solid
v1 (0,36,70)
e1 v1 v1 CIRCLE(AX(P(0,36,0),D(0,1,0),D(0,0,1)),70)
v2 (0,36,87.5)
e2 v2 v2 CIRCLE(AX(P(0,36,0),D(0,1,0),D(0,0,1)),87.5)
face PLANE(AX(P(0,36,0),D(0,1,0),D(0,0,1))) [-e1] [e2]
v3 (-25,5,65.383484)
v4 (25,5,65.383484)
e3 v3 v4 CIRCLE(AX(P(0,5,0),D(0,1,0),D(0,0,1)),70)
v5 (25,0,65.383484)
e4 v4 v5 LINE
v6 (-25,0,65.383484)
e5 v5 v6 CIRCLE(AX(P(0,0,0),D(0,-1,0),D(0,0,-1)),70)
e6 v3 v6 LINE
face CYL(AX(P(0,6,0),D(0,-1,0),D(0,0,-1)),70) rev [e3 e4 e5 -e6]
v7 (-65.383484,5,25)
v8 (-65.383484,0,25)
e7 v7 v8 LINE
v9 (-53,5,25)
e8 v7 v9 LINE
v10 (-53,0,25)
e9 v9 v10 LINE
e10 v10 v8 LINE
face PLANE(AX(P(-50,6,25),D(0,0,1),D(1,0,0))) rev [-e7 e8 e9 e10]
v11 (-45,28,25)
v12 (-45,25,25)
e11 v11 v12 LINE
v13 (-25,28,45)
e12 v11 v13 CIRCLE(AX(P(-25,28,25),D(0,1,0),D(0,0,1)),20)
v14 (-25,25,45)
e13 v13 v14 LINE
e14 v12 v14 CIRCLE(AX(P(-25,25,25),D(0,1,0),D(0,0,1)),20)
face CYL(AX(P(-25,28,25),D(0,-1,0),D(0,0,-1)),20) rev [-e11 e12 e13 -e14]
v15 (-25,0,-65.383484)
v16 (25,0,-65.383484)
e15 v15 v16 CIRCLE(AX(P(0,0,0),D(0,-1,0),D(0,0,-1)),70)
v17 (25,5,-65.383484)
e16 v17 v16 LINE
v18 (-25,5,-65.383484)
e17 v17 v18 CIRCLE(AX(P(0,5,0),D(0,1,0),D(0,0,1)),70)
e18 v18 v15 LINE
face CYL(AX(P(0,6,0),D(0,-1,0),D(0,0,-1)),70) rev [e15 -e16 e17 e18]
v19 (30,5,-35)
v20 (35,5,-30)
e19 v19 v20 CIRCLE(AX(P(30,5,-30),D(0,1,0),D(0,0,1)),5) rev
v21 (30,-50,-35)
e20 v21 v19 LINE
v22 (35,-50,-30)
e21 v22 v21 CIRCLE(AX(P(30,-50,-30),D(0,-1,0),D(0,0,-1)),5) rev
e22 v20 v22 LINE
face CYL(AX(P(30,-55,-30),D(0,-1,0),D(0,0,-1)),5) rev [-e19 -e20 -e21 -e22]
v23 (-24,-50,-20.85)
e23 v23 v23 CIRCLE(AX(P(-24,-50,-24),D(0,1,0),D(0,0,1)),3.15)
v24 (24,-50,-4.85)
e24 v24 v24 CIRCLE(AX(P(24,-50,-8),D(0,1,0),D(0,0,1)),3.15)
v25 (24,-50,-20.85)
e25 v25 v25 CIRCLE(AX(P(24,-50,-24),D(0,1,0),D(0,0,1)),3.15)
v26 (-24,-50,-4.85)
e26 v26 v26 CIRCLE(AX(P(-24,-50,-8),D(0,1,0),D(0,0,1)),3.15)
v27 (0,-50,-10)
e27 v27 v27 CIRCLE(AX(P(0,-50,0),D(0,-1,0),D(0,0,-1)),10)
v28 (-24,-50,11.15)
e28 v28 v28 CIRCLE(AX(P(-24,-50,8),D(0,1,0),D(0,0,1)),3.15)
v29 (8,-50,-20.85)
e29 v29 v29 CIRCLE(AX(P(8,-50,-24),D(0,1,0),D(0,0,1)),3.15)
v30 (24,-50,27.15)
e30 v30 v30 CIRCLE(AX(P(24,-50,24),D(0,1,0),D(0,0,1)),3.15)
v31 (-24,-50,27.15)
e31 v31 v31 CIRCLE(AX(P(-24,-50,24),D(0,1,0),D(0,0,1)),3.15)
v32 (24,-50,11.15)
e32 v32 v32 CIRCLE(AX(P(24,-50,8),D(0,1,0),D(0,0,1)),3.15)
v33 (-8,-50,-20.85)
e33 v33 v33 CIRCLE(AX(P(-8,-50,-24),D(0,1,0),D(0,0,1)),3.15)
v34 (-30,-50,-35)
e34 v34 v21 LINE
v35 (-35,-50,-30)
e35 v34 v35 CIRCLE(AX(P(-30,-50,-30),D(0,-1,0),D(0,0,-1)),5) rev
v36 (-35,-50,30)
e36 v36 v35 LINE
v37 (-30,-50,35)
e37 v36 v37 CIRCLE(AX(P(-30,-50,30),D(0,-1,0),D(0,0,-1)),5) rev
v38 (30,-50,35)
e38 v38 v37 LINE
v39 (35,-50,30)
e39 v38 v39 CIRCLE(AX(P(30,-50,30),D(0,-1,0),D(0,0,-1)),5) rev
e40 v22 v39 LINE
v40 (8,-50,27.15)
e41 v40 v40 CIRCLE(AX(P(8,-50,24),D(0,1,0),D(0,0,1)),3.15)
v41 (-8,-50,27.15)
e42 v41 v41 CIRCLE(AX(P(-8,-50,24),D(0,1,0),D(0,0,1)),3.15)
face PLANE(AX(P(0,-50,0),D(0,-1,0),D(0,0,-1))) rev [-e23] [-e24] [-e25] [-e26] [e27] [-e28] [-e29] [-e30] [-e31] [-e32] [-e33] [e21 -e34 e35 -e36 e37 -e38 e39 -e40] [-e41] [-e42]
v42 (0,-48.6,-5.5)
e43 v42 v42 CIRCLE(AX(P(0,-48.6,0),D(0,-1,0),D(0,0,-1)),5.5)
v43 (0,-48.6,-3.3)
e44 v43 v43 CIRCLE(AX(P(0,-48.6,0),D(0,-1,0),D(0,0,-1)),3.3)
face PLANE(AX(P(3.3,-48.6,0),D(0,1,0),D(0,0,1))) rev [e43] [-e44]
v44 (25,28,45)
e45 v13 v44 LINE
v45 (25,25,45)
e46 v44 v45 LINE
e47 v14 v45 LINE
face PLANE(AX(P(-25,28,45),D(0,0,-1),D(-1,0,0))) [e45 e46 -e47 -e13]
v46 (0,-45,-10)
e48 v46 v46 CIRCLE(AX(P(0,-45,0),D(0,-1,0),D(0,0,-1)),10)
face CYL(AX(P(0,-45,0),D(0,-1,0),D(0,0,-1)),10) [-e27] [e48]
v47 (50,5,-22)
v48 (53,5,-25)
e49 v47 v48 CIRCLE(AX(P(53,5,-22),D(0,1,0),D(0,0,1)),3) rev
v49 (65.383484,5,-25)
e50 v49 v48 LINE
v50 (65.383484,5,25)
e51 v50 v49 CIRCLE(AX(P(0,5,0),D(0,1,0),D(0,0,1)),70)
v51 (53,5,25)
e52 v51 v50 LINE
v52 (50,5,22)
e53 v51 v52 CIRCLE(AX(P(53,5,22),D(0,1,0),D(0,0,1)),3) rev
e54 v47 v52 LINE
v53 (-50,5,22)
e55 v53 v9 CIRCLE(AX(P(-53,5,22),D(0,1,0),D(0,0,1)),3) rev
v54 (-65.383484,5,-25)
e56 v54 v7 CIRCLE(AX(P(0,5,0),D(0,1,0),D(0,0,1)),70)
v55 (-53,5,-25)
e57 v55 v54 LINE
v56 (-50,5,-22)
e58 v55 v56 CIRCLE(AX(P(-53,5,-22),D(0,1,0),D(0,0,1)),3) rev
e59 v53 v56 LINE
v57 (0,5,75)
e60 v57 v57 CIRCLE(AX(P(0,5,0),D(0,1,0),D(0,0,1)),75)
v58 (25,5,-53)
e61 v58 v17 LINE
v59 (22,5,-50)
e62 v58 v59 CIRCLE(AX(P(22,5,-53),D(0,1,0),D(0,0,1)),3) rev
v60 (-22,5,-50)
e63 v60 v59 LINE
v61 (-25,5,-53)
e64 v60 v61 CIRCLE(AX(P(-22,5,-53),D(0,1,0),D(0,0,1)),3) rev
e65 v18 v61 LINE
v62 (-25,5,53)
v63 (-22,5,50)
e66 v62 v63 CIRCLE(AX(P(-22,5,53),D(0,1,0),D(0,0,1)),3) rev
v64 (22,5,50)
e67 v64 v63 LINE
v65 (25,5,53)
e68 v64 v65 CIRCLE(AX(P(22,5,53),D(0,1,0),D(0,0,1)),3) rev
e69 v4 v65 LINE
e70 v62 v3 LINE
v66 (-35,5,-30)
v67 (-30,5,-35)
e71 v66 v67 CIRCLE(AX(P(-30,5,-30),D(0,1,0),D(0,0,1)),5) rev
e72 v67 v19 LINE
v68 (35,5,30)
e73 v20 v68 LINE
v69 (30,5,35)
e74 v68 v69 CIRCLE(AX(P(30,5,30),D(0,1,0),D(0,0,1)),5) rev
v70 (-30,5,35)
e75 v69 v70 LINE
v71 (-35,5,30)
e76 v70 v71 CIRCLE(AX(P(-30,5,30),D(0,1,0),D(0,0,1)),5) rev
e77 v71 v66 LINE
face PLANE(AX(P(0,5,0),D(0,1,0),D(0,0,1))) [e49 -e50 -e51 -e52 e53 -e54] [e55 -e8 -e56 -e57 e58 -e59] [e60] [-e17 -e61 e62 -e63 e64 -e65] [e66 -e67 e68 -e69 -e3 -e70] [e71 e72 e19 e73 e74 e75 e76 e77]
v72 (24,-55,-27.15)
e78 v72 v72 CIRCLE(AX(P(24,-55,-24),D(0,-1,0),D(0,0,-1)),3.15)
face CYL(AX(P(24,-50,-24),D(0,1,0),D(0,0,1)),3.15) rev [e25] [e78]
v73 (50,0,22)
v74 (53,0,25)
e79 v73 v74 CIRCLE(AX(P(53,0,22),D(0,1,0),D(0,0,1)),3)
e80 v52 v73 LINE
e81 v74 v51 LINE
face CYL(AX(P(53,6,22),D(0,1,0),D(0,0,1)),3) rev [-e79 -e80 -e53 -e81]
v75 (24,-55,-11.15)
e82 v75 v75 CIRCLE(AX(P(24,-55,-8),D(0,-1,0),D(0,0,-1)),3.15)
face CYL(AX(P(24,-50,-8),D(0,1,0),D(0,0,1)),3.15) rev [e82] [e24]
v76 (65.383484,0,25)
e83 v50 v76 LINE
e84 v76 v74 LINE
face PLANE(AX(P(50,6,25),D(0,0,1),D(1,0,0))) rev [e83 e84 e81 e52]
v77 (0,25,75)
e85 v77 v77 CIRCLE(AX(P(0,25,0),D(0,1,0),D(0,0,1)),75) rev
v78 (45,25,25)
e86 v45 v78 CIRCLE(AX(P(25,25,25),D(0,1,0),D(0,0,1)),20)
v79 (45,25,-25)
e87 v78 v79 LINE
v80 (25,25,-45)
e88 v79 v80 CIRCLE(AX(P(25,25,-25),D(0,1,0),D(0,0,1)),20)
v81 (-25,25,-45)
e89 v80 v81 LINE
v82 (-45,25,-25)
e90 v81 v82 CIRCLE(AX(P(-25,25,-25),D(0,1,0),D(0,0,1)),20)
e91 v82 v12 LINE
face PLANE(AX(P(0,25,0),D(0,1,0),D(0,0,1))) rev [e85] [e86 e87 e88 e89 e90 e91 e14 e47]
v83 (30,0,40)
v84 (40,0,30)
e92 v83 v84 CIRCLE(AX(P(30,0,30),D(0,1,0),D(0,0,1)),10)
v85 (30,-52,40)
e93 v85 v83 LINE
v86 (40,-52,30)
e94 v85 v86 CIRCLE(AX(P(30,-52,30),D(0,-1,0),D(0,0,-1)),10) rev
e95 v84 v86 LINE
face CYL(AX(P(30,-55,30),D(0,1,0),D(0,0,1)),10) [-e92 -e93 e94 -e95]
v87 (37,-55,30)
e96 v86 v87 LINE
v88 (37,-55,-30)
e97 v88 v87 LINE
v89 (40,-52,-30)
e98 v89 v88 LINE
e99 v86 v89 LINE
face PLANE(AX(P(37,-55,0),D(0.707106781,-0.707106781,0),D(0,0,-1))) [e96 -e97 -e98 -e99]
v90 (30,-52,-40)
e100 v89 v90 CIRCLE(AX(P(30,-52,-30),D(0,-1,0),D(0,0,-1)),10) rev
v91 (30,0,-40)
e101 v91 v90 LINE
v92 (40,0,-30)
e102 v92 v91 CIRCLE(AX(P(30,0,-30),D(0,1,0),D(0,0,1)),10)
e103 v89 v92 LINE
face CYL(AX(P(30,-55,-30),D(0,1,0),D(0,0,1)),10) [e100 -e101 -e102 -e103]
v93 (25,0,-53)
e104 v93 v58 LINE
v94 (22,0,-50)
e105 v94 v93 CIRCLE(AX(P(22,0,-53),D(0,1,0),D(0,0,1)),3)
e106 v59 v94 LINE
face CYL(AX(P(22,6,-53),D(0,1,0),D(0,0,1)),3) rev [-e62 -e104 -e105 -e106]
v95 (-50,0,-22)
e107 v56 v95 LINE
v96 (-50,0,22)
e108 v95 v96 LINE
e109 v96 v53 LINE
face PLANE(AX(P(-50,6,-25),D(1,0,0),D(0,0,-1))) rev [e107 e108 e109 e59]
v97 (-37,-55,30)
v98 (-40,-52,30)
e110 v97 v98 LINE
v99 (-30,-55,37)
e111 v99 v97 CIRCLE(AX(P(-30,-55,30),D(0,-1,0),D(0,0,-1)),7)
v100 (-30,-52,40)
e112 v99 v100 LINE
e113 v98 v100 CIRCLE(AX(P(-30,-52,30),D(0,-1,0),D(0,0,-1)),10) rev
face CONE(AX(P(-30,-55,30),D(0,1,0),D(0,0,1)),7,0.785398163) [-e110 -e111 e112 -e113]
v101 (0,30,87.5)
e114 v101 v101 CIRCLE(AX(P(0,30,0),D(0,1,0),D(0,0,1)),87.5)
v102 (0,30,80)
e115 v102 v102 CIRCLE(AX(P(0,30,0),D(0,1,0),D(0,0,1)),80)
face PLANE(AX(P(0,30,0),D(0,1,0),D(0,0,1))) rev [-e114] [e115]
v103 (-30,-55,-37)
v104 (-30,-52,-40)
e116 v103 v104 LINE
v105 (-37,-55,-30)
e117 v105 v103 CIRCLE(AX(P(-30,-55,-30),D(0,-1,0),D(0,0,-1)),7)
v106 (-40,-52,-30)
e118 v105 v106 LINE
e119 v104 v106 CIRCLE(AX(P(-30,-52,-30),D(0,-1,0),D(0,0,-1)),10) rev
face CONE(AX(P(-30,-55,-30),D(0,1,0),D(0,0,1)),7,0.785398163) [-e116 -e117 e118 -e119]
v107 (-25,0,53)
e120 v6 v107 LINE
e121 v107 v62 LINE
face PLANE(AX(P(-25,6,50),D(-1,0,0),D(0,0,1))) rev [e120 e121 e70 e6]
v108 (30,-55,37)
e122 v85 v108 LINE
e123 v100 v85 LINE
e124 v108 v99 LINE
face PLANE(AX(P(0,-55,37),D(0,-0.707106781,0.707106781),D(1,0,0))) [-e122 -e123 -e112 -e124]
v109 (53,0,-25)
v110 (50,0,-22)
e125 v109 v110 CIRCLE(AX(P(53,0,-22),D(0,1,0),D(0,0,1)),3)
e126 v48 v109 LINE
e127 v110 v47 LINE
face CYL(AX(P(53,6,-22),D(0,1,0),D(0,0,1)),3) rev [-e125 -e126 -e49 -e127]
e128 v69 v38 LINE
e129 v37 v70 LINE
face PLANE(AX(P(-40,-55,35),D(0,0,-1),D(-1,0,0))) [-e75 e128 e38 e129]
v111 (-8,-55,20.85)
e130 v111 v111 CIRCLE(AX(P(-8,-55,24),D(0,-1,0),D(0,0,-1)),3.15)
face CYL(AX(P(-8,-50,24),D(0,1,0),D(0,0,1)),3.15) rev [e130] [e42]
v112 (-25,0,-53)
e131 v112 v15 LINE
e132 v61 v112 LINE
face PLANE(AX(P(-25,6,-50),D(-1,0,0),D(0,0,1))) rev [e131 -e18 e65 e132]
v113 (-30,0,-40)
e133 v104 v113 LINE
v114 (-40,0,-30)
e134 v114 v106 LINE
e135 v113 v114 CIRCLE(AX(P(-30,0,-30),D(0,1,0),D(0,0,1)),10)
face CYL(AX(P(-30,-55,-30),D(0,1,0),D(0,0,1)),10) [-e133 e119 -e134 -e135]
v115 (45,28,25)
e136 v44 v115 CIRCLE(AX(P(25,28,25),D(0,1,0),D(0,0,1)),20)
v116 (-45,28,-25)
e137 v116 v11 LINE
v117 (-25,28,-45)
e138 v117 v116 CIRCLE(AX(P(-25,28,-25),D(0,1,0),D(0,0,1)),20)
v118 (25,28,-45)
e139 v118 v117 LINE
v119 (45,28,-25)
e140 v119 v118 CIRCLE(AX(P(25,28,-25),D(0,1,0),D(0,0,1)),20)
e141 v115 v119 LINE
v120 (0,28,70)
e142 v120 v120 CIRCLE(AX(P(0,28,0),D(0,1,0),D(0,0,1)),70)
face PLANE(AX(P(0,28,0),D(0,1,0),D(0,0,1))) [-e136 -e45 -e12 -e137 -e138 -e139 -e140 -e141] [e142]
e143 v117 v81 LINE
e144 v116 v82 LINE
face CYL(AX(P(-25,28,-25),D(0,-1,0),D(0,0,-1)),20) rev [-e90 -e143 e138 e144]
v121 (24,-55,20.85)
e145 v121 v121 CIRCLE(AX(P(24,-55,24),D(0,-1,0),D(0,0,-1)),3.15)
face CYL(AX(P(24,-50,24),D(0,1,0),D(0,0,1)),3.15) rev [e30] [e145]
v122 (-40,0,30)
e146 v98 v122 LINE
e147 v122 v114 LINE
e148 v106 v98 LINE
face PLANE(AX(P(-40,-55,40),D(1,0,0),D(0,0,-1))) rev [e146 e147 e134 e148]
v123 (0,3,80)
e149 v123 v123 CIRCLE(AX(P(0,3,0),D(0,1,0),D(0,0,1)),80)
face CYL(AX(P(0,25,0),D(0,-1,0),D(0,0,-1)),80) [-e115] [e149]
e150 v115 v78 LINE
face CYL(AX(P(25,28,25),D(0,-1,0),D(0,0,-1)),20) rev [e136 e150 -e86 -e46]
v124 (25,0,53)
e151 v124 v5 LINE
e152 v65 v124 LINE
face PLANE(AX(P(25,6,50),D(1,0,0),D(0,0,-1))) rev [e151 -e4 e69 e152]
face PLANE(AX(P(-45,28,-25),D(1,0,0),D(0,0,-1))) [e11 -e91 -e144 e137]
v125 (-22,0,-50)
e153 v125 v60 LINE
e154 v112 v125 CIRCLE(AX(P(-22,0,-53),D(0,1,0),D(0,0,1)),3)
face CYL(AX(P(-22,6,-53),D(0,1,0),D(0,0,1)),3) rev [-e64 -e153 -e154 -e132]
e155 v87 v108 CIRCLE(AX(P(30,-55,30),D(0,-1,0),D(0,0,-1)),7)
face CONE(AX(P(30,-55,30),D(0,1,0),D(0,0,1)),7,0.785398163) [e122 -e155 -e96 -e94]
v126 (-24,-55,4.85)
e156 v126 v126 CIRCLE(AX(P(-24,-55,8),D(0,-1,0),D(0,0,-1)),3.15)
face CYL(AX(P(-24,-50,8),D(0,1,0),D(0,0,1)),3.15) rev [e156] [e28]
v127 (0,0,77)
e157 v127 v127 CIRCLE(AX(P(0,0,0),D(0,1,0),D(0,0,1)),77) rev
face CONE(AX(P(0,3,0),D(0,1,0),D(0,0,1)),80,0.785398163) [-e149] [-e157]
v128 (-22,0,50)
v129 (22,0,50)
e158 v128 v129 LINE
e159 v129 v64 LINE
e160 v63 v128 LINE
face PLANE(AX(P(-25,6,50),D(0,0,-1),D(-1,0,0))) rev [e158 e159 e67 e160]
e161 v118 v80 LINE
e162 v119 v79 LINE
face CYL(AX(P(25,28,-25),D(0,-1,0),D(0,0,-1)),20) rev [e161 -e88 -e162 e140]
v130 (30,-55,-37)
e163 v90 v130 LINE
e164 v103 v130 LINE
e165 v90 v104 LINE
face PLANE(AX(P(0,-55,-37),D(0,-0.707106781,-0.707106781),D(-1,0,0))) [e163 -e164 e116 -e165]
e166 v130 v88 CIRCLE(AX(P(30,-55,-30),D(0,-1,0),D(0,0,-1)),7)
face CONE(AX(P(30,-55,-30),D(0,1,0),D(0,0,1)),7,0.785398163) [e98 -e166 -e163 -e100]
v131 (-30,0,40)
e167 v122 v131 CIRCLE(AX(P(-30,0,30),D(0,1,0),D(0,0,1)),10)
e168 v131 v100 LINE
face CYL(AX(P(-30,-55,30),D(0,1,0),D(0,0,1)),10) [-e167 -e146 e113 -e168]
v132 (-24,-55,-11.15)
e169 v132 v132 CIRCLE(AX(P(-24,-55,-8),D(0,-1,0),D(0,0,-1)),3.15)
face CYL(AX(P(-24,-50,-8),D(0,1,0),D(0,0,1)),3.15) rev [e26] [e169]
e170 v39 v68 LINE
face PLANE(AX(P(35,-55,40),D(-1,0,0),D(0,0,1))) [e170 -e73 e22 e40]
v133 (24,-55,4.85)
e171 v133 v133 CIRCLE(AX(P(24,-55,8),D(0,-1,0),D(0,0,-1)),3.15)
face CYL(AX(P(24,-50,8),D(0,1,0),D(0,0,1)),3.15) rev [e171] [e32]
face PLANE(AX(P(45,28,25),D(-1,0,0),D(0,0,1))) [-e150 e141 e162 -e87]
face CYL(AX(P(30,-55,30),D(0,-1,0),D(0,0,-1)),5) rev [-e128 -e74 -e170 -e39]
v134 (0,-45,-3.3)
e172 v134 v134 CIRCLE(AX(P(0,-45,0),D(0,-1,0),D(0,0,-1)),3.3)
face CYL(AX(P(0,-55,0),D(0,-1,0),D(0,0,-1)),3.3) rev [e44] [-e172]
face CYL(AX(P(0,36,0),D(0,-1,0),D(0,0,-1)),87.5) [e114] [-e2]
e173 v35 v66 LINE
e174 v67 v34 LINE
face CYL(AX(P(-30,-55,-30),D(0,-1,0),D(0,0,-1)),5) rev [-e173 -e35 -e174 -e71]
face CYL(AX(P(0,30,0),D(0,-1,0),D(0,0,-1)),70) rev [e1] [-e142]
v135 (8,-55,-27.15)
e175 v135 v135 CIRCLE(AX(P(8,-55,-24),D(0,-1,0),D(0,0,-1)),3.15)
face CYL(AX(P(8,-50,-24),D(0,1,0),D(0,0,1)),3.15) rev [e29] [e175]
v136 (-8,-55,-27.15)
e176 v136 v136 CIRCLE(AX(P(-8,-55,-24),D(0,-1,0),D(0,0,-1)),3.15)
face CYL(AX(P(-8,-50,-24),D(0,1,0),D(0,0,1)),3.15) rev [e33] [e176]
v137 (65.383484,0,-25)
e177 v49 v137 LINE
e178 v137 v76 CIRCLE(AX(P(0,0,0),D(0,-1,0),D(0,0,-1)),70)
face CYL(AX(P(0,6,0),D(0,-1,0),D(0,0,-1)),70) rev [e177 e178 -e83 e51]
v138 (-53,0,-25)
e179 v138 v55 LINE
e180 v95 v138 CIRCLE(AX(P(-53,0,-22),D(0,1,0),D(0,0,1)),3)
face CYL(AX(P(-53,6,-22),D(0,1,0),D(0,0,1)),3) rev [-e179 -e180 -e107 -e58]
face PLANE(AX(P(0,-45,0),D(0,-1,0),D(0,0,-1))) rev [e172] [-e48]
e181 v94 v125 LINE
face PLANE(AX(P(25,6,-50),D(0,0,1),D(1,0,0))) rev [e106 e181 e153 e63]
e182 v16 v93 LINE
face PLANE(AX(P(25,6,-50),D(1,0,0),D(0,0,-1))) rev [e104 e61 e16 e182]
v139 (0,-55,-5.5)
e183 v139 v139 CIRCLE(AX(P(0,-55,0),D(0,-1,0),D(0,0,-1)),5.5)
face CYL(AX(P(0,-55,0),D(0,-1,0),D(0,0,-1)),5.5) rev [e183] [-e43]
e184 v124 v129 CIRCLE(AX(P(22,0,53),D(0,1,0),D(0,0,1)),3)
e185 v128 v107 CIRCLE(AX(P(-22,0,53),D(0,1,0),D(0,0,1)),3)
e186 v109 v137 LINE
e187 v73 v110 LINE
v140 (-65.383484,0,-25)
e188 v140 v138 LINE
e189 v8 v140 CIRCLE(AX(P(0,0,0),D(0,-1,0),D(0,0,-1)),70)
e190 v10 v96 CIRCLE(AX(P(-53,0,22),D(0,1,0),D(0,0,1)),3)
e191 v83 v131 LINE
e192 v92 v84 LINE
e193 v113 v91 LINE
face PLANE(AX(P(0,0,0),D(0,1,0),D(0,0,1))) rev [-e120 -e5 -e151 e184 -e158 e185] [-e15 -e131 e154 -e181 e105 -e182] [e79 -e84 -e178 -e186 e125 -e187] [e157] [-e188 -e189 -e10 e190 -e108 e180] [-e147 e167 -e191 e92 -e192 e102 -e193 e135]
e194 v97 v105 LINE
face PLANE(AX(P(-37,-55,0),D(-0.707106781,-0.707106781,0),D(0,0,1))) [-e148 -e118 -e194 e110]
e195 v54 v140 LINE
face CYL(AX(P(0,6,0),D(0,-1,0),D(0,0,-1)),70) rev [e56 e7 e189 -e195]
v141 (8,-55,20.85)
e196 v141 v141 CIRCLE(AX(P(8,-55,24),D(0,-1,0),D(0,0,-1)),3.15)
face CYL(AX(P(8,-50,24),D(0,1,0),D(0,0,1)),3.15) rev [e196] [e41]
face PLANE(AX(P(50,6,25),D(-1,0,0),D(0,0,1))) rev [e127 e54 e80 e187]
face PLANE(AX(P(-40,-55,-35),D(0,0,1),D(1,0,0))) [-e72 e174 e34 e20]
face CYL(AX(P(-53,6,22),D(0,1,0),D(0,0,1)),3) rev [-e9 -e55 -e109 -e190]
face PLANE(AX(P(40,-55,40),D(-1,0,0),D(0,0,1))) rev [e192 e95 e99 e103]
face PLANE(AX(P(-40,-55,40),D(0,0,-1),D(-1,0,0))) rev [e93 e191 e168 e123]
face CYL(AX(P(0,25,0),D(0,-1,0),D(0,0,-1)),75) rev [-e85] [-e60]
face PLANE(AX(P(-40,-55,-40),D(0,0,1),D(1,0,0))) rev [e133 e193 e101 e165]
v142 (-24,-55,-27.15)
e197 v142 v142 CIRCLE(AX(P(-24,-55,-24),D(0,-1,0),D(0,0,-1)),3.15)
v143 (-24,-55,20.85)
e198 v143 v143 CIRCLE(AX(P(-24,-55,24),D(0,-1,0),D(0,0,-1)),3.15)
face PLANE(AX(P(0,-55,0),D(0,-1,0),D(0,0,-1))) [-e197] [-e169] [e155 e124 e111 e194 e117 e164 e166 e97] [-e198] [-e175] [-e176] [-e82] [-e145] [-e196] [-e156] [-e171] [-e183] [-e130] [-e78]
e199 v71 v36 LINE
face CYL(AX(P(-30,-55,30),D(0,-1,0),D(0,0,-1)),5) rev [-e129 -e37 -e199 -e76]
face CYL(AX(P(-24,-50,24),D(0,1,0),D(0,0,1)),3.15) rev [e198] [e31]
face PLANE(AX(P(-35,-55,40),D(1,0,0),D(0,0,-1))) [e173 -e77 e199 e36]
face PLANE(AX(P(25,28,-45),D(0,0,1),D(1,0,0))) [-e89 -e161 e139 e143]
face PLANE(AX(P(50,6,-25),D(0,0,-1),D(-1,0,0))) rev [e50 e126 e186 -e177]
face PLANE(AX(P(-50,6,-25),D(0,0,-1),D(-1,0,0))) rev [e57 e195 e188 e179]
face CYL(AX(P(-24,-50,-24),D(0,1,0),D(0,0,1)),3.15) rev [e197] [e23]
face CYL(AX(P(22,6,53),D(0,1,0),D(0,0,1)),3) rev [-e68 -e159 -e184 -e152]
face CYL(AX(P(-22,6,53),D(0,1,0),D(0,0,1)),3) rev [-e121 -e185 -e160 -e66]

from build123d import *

# Parameters (mm, degrees)
SKETCH1_R                                           = 80
BOSS_EXTRUDE1_DEPTH                                 = 25
SKETCH2_R                                           = 80
SKETCH2_R_2                                         = 70
BOSS_EXTRUDE2_DEPTH                                 = 5
SKETCH3_R                                           = 87.5
SKETCH3_R_2                                         = 70
BOSS_EXTRUDE3_DEPTH                                 = 6
SKETCH5_W                                           = 80
SKETCH5_H                                           = 80
BOSS_EXTRUDE4_DEPTH                                 = 55
SHELL1_START                                        = -50
SHELL1_OUTLINE_W                                    = 70
SHELL1_OUTLINE_H                                    = 70
SHELL1_DEPTH                                        = 75
SHELL1_START_2                                      = 5
SHELL1_2_OUTLINE_R                                  = 75
SHELL1_2_OUTLINE_W                                  = 70
SHELL1_2_OUTLINE_H                                  = 70
SHELL1_2_DEPTH                                      = 20
F_6_3_6_3_DIAMETER_HOLE1_D                          = 6.3
F_6_3_6_3_DIAMETER_HOLE1_DEPTH                      = 10
F_6_3_6_3_DIAMETER_HOLE1_TIP                        = 1.89271095
SKETCH9_R                                           = 5.623813335
BOSS_EXTRUDE5_DEPTH                                 = 5
SKETCH11_R                                          = 70
BOSS_EXTRUDE6_DEPTH                                 = 3
CUT_EXTRUDE2_DEPTH                                  = 6
FILLET2_R                                           = 3
SKETCH18_R                                          = 15.880068884
BOSS_EXTRUDE9_DEPTH                                 = 5
SKETCH19_R                                          = 10
BOSS_EXTRUDE10_DEPTH                                = 10
CBORE_FOR_M6_HEX_SOCKET_HEAD_CAP_SCREW1_D           = 6.6
CBORE_FOR_M6_HEX_SOCKET_HEAD_CAP_SCREW1_CBORE_D     = 11
CBORE_FOR_M6_HEX_SOCKET_HEAD_CAP_SCREW1_CBORE_DEPTH = 6.4
FILLET7_R                                           = 10
FILLET8_R                                           = 5
CHAMFER1_SIZE                                       = 3


# Read off the part's stored shape, not the designer's step: Shell1
with BuildPart() as part:
    # Sketch1 → Boss-Extrude1 (new body)
    with BuildSketch(Plane(origin=(0, 0, 0), x_dir=(1, 0, 0), z_dir=(0, 1, 0))):
        with Locations(Location((0, 0, 0), (0, 0, 270))):
            Circle(SKETCH1_R)
    extrude(amount=BOSS_EXTRUDE1_DEPTH)

    # Sketch2 → Boss-Extrude2 (add)
    with BuildSketch(Plane(origin=(0, 25, 0), x_dir=(1, 0, 0), z_dir=(0, 1, 0))):
        with Locations(Location((0, 0, 0), (0, 0, 270))):
            Circle(SKETCH2_R)
        with Locations(Location((0, 0, 0), (0, 0, 270))):
            Circle(SKETCH2_R_2, mode=Mode.SUBTRACT)
    extrude(amount=BOSS_EXTRUDE2_DEPTH)

    # Sketch3 → Boss-Extrude3 (add)
    with BuildSketch(Plane(origin=(0, 30, 0), x_dir=(1, 0, 0), z_dir=(0, 1, 0))):
        with Locations(Location((0, 0, 0), (0, 0, 270))):
            Circle(SKETCH3_R)
        with Locations(Location((0, 0, 0), (0, 0, 270))):
            Circle(SKETCH3_R_2, mode=Mode.SUBTRACT)
    extrude(amount=BOSS_EXTRUDE3_DEPTH)

    # Sketch5 → Boss-Extrude4 (add)
    with BuildSketch(Plane.XZ):
        Rectangle(SKETCH5_W, SKETCH5_H)
    extrude(amount=BOSS_EXTRUDE4_DEPTH)

    # Shell1 outline → Shell1 (cut)
    with BuildSketch(Plane(origin=(0, 0, 0), x_dir=(1, 0, 0), z_dir=(0, 1, 0)).offset(SHELL1_START)):
        Rectangle(SHELL1_OUTLINE_W, SHELL1_OUTLINE_H)
    extrude(amount=SHELL1_DEPTH, mode=Mode.SUBTRACT)

    # Shell1 2 outline → Shell1 2 (cut)
    with BuildSketch(Plane(origin=(0, 0, 0), x_dir=(1, 0, 0), z_dir=(0, 1, 0)).offset(SHELL1_START_2)):
        Circle(SHELL1_2_OUTLINE_R)
        Rectangle(SHELL1_2_OUTLINE_W, SHELL1_2_OUTLINE_H, mode=Mode.SUBTRACT)
    extrude(amount=SHELL1_2_DEPTH, mode=Mode.SUBTRACT)

    # Ø6.3 (6.3) Diameter Hole1
    with Locations(Plane(origin=(0, -50, 0), x_dir=(1, 0, 0), z_dir=(0, 1, 0))):
        with Locations((0, 0), (24, -24), (-24, 24), (-24, -24), (24, 24), (8, -8), (-8, 8), (-8, -8), (8, 8), (8, 24), (24, 8), (-8, 24), (-24, 8), (-24, -8), (-8, -24), (8, -24), (24, -8)):
            Hole(F_6_3_6_3_DIAMETER_HOLE1_D / 2, depth=F_6_3_6_3_DIAMETER_HOLE1_DEPTH)
            with Locations((0, 0, -(F_6_3_6_3_DIAMETER_HOLE1_DEPTH + F_6_3_6_3_DIAMETER_HOLE1_TIP / 2))):  # 118° drill point
                Cone(0, F_6_3_6_3_DIAMETER_HOLE1_D / 2, F_6_3_6_3_DIAMETER_HOLE1_TIP, mode=Mode.SUBTRACT)

    # Sketch9 → Boss-Extrude5 (add)
    with BuildSketch(Plane(origin=(0, -50, 0), x_dir=(1, 0, 0), z_dir=(0, 1, 0))):
        Circle(SKETCH9_R)
    extrude(amount=-BOSS_EXTRUDE5_DEPTH)

    # Sketch11 → Boss-Extrude6 (add)
    with BuildSketch(Plane(origin=(0, 25, 0), x_dir=(1, 0, 0), z_dir=(0, 1, 0))):
        with Locations(Location((0, 0, 0), (0, 0, 270))):
            Circle(SKETCH11_R)
        with BuildLine():
            Line((-45, 25), (-45, -25))
            ThreePointArc((-45, -25), (-39.142135624, -39.142135624), (-25, -45))
            Line((-25, -45), (25, -45))
            ThreePointArc((25, -45), (39.142135624, -39.142135624), (45, -25))
            Line((45, -25), (45, 25))
            ThreePointArc((45, 25), (39.142135624, 39.142135624), (25, 45))
            Line((25, 45), (-25, 45))
            ThreePointArc((-25, 45), (-39.142135624, 39.142135624), (-45, 25))
        make_face(mode=Mode.SUBTRACT)
    extrude(amount=BOSS_EXTRUDE6_DEPTH)

    # Sketch12 → Cut-Extrude2 (cut)
    with BuildSketch(Plane.XZ):
        with BuildLine():
            Line((-50, 25), (-65.383484153, 25))
            ThreePointArc((-65.383484153, 25), (-70, 0), (-65.383484153, -25))
            Line((-65.383484153, -25), (-50, -25))
            Line((-50, -25), (-50, 25))
        make_face()
        with BuildLine():
            Line((-25, 50), (-25, 65.383484153))
            ThreePointArc((-25, 65.383484153), (0, 70), (25, 65.383484153))
            Line((25, 65.383484153), (25, 50))
            Line((25, 50), (-25, 50))
        make_face()
        with BuildLine():
            Line((50, 25), (65.383484153, 25))
            ThreePointArc((65.383484153, 25), (70, 0), (65.383484153, -25))
            Line((65.383484153, -25), (50, -25))
            Line((50, -25), (50, 25))
        make_face()
        with BuildLine():
            Line((25, -50), (-25, -50))
            Line((-25, -50), (-25, -65.383484153))
            ThreePointArc((-25, -65.383484153), (0, -70), (25, -65.383484153))
            Line((25, -65.383484153), (25, -50))
        make_face()
    extrude(amount=-CUT_EXTRUDE2_DEPTH, mode=Mode.SUBTRACT)

    # Fillet2
    fillet2_edges = [part.edges().sort_by_distance(p)[0] for p in [
        (-50, 2.5, 25),
        (-50, 2.5, -25),
        (25, 2.5, 50),
        (-25, 2.5, 50),
        (50, 2.5, -25),
        (50, 2.5, 25),
        (-25, 2.5, -50),
        (25, 2.5, -50),
    ]]
    fillet(fillet2_edges, radius=FILLET2_R)

    # Sketch18 → Boss-Extrude9 (add)
    with BuildSketch(Plane.XZ.offset(55)):
        Circle(SKETCH18_R)
    extrude(amount=-BOSS_EXTRUDE9_DEPTH)

    # Sketch19 → Boss-Extrude10 (add)
    with BuildSketch(Plane.XZ.offset(55)):
        with Locations(Location((0, 0, 0), (0, 0, 270))):
            Circle(SKETCH19_R)
    extrude(amount=-BOSS_EXTRUDE10_DEPTH)

    # CBORE for M6 Hex Socket Head Cap Screw1 (through all)
    with Locations(Plane(origin=(0, -55, 0), x_dir=(-1, 0, 0), z_dir=(0, -1, 0))):
        with Locations((0, 0)):
            CounterBoreHole(CBORE_FOR_M6_HEX_SOCKET_HEAD_CAP_SCREW1_D / 2, CBORE_FOR_M6_HEX_SOCKET_HEAD_CAP_SCREW1_CBORE_D / 2, CBORE_FOR_M6_HEX_SOCKET_HEAD_CAP_SCREW1_CBORE_DEPTH)

    # Fillet7
    fillet7_edges = [part.edges().sort_by_distance(p)[0] for p in [
        (40, -27.5, -40),
        (40, -27.5, 40),
        (-40, -27.5, 40),
        (-40, -27.5, -40),
    ]]
    fillet(fillet7_edges, radius=FILLET7_R)

    # Fillet8
    fillet8_edges = [part.edges().sort_by_distance(p)[0] for p in [
        (35, -22.5, -35),
        (35, -22.5, 35),
        (-35, -22.5, 35),
        (-35, -22.5, -35),
    ]]
    fillet(fillet8_edges, radius=FILLET8_R)

    # Chamfer1
    chamfer1_edges = [part.edges().sort_by_distance(p)[0] for p in [
        (0, 0, -80),
        (0, -55, -40),
        (-40, -55, 0),
        (40, -55, 0),
        (0, -55, 40),
        (-37.071067812, -55, 37.071067812),
        (37.071067812, -55, 37.071067812),
        (37.071067812, -55, -37.071067812),
        (-37.071067812, -55, -37.071067812),
    ]]
    chamfer(chamfer1_edges, length=CHAMFER1_SIZE)


solid = part.part
